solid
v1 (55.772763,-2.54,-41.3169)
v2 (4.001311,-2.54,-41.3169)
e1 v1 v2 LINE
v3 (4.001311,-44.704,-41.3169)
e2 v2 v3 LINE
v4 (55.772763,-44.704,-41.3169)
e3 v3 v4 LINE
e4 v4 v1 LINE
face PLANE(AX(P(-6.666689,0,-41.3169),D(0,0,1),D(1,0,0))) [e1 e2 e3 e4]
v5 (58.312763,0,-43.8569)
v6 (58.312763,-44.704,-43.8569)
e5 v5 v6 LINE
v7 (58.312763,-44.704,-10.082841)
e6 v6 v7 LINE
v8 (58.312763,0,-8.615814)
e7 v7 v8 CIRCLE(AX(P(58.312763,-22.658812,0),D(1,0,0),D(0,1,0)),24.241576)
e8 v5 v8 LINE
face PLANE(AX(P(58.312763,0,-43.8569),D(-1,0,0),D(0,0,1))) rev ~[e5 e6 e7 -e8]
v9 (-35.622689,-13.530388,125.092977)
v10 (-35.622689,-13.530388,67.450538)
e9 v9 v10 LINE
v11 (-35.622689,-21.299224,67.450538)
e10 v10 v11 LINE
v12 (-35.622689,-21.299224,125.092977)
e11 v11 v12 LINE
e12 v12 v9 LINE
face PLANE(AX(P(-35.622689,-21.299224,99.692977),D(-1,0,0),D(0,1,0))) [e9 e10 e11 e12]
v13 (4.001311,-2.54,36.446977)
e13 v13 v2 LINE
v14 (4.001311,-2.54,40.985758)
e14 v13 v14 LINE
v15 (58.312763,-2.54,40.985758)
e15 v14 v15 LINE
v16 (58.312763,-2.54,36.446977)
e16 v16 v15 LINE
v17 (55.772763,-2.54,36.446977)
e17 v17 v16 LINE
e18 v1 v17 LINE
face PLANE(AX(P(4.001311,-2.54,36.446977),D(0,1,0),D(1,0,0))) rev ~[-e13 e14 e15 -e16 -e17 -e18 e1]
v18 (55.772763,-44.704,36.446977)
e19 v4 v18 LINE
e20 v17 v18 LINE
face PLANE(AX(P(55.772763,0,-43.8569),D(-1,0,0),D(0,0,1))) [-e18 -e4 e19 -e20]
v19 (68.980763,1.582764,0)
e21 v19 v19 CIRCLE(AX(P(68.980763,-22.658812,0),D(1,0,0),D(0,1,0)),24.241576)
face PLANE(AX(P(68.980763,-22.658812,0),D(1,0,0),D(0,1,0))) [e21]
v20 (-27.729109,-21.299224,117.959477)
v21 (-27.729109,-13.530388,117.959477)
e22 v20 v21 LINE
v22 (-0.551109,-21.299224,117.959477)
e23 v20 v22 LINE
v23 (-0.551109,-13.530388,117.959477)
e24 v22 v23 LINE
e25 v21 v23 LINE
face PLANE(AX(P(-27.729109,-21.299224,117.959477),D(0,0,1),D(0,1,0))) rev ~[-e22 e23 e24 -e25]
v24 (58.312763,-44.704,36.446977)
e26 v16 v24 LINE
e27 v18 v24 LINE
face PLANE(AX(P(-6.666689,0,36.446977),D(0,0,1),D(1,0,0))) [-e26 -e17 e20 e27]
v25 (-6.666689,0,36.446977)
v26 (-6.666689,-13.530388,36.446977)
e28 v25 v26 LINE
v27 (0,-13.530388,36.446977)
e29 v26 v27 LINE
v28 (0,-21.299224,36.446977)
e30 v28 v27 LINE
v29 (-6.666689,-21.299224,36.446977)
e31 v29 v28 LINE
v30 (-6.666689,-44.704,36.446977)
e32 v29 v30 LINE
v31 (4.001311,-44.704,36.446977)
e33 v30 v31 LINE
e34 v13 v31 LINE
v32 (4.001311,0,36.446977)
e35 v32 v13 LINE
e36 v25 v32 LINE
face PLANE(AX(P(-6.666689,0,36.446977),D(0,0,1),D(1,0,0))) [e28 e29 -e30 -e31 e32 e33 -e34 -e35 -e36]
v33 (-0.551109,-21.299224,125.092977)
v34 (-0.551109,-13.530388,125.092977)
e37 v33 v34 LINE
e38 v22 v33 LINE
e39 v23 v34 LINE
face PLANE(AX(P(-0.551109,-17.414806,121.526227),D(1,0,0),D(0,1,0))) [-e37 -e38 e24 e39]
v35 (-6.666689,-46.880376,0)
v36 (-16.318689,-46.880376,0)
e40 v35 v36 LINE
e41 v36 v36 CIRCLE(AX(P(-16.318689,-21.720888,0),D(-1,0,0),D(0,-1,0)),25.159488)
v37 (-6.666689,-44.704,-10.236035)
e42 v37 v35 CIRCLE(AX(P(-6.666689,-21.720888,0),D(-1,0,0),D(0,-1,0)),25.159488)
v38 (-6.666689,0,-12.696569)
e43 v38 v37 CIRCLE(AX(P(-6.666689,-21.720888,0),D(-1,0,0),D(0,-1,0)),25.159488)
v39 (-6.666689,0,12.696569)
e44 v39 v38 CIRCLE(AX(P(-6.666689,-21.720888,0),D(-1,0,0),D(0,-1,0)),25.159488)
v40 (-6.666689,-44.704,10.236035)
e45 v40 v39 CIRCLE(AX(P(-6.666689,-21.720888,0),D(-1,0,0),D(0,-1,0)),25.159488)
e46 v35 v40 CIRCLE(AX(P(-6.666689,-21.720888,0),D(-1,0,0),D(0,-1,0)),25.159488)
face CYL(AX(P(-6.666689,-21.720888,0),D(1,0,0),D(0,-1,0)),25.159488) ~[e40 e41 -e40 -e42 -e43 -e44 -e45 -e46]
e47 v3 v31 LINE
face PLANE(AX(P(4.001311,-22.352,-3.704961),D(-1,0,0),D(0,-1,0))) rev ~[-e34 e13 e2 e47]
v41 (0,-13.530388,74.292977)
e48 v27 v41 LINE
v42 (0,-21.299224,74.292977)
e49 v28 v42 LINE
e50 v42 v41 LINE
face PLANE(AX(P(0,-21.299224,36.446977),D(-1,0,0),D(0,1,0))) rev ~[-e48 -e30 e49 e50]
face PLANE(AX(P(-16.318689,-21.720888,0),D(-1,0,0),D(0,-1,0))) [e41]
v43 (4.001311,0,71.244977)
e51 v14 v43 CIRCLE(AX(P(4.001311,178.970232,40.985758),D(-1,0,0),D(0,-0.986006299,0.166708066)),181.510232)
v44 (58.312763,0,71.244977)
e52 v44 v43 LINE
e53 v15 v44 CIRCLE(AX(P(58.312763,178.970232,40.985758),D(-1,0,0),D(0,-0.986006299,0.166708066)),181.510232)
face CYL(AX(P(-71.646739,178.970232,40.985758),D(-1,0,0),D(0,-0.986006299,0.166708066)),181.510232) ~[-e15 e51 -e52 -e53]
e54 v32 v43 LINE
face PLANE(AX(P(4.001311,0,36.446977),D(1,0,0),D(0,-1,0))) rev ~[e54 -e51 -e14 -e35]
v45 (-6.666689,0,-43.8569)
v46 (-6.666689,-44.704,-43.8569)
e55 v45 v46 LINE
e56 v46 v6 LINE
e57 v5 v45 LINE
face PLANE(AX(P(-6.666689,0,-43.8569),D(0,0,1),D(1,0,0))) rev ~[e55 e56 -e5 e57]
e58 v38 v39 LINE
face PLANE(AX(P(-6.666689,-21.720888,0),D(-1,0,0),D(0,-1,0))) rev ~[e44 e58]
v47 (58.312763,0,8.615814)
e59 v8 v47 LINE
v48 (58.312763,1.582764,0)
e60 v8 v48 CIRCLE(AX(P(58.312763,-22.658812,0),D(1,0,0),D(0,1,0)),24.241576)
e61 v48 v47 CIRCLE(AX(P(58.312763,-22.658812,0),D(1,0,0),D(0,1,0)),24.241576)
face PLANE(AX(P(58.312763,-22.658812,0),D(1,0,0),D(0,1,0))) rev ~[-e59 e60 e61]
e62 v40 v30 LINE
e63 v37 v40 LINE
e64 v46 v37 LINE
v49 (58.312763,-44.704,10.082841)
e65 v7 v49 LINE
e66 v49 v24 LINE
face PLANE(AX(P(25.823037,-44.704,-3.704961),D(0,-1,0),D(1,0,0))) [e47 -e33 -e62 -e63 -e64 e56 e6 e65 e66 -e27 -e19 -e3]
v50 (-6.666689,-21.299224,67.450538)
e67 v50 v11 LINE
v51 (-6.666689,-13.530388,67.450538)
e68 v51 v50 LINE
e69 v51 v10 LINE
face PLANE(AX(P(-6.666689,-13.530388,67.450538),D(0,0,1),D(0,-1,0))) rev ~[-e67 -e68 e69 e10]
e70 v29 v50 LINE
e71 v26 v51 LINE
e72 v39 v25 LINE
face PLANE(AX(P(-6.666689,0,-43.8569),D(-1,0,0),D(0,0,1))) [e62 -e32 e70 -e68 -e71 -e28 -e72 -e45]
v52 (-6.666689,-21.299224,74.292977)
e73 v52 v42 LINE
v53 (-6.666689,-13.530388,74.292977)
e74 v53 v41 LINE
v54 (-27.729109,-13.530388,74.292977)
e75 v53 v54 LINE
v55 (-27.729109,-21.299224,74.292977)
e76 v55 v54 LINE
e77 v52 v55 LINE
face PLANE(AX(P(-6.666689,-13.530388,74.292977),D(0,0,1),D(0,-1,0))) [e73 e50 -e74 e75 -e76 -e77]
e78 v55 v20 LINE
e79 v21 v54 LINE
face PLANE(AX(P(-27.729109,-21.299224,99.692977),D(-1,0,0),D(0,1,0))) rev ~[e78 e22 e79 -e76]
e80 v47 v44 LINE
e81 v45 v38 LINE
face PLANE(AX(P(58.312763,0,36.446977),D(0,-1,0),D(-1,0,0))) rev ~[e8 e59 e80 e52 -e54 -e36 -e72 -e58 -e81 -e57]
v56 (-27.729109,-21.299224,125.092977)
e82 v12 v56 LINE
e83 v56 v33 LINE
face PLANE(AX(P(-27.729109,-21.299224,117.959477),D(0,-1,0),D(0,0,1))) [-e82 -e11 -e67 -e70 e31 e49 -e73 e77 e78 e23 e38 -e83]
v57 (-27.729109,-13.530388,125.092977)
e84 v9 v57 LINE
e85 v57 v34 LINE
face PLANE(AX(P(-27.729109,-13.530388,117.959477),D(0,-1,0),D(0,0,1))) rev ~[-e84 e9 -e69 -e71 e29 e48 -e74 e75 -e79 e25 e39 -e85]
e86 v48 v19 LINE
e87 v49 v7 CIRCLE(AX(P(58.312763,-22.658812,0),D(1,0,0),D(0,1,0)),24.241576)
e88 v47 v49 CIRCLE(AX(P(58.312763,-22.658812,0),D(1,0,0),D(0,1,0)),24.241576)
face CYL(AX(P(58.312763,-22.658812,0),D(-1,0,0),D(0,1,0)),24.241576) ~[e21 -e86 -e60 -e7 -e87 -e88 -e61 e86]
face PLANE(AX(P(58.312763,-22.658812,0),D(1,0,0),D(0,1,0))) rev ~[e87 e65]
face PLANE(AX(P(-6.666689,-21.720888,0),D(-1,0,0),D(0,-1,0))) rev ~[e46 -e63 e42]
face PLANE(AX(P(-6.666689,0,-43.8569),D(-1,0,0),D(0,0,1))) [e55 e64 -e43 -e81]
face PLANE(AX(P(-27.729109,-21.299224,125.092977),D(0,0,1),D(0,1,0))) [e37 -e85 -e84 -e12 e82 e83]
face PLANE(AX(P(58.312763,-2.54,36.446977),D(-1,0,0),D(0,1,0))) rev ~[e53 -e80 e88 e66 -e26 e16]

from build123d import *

# Parameters (mm, degrees)
F0_W         = 64.9794517085
F0_H         = 80.3038775921
F1_DEPTH     = 44.704
F2_T         = -2.54
F3_R         = 24.241575959
F1_FACE1_W   = 44.704
F1_FACE1_H   = 80.3038775921
F4_DEPTH     = 10.668
F5_R         = 25.1594880742
F6_DEPTH     = 9.652
F7_W         = 6.6666891798
F7_H         = 7.7688368037
F8_DEPTH     = 37.846
F9_W         = 7.7688368037
F9_H         = 6.8424391291
F10_DEPTH    = 28.956
F11_W        = 7.8935802502
F11_H        = 7.7688368037
F12_DEPTH    = 25.4
F13_DEPTH    = 25.4
F15_DEPTH    = 34.798
F16_T1_DEPTH = 205.6075505485
F17_W        = 7.7688368037
F17_H        = 7.1335003994
F18_DEPTH    = 27.178


# Not quite as in the source:
# - a fillet or chamfer that OpenCascade refuses, or shapes differently, is made with other operations: its cross-section is extruded or revolved along the edge and cut away or added


with BuildPart() as f1:
    # F0 (on Front) → F1 (new body)
    with BuildSketch(Plane.XZ):
        with Locations((25.8230366744, -3.7049613893)):
            Rectangle(F0_W, F0_H)
    extrude(amount=F1_DEPTH)

    # F2
    f2_openings = [f1.faces().sort_by_distance(p)[0] for p in [
        (25.823037, -22.352, 36.446977),
        (25.823037, -44.704, -3.704961),
    ]]
    offset(amount=F2_T, openings=f2_openings)

    # F3 (on face) + F1_face1 (on face) → F4 (join)
    with BuildSketch(Plane.YZ.offset(58.3127625287)):
        with Locations((-22.6588118821, 0)):
            Circle(F3_R)
    with BuildSketch(Plane(origin=(-6.6666891798, -22.352, -3.7049613893), x_dir=(0, -1, 0), z_dir=(-1, 0, 0))):
        Rectangle(F1_FACE1_W, F1_FACE1_H)
    extrude(amount=F4_DEPTH, dir=(1, 0, 0))

    # F5 (on face) → F6 (join)
    with BuildSketch(Plane(origin=(-6.6666891798, 0, 0), x_dir=(0, -1, 0), z_dir=(-1, 0, 0))):
        with Locations((21.7208880931, 0)):
            Circle(F5_R)
    extrude(amount=F6_DEPTH)

    # F7 (on face) → F8 (join)
    with BuildSketch(Plane.XY.offset(36.4469774067)):
        with Locations((-3.3333445899, -17.414805945)):
            Rectangle(F7_W, F7_H)
    extrude(amount=F8_DEPTH)

    # F9 (on face) → F10 (join)
    with BuildSketch(Plane(origin=(-6.6666891798, 0, 0), x_dir=(0, -1, 0), z_dir=(-1, 0, 0))):
        with Locations((17.414805945, 70.8717578422)):
            Rectangle(F9_W, F9_H)
    extrude(amount=F10_DEPTH)

    # F11 (on face) → F12 (join)
    with BuildSketch(Plane.XY.offset(74.2929774067)):
        with Locations((-31.6758990547, -17.414805945)):
            Rectangle(F11_W, F11_H)
    extrude(amount=F12_DEPTH)

    # F13 (add): a face of the model
    f13_faces = [f1.faces().sort_by_distance(p)[0] for p in [
        (-31.6758990547, -17.414805945, 99.6929774067),
    ]]
    extrude(f13_faces, amount=F13_DEPTH)

    # F14 (on face) → F15 (join)
    with BuildSketch(Plane.XY.offset(36.4469774067)):
        Polygon((58.3127625287, -2.54), (58.3127625287, 0), (4.0013108202, 0), (4.0013108202, -2.54), (55.7727625287, -2.54), align=None)
    extrude(amount=F15_DEPTH)

    # F16: fillet of radius 181.5102324735 on 1 edges, made by hand

    # F16_s2 → F16_t1 (cut)
    with BuildSketch(Plane.YZ.offset(-71.6467385999)):
        with BuildLine():
            ThreePointArc((0, 71.2449774067), (-1.903885347, 56.1685767196), (-2.54, 40.9857576387))
            Line((-2.54, 40.9857576387), (-2.54, 71.2449774067))
            Line((-2.54, 71.2449774067), (0, 71.2449774067))
        make_face()
    extrude(amount=F16_T1_DEPTH, mode=Mode.SUBTRACT)

    # F17 (on face) → F18 (join)
    with BuildSketch(Plane.YZ.offset(-27.7291089296)):
        with Locations((-17.414805945, 121.5262272071)):
            Rectangle(F17_W, F17_H)
    extrude(amount=F18_DEPTH)


solid = f1.part
